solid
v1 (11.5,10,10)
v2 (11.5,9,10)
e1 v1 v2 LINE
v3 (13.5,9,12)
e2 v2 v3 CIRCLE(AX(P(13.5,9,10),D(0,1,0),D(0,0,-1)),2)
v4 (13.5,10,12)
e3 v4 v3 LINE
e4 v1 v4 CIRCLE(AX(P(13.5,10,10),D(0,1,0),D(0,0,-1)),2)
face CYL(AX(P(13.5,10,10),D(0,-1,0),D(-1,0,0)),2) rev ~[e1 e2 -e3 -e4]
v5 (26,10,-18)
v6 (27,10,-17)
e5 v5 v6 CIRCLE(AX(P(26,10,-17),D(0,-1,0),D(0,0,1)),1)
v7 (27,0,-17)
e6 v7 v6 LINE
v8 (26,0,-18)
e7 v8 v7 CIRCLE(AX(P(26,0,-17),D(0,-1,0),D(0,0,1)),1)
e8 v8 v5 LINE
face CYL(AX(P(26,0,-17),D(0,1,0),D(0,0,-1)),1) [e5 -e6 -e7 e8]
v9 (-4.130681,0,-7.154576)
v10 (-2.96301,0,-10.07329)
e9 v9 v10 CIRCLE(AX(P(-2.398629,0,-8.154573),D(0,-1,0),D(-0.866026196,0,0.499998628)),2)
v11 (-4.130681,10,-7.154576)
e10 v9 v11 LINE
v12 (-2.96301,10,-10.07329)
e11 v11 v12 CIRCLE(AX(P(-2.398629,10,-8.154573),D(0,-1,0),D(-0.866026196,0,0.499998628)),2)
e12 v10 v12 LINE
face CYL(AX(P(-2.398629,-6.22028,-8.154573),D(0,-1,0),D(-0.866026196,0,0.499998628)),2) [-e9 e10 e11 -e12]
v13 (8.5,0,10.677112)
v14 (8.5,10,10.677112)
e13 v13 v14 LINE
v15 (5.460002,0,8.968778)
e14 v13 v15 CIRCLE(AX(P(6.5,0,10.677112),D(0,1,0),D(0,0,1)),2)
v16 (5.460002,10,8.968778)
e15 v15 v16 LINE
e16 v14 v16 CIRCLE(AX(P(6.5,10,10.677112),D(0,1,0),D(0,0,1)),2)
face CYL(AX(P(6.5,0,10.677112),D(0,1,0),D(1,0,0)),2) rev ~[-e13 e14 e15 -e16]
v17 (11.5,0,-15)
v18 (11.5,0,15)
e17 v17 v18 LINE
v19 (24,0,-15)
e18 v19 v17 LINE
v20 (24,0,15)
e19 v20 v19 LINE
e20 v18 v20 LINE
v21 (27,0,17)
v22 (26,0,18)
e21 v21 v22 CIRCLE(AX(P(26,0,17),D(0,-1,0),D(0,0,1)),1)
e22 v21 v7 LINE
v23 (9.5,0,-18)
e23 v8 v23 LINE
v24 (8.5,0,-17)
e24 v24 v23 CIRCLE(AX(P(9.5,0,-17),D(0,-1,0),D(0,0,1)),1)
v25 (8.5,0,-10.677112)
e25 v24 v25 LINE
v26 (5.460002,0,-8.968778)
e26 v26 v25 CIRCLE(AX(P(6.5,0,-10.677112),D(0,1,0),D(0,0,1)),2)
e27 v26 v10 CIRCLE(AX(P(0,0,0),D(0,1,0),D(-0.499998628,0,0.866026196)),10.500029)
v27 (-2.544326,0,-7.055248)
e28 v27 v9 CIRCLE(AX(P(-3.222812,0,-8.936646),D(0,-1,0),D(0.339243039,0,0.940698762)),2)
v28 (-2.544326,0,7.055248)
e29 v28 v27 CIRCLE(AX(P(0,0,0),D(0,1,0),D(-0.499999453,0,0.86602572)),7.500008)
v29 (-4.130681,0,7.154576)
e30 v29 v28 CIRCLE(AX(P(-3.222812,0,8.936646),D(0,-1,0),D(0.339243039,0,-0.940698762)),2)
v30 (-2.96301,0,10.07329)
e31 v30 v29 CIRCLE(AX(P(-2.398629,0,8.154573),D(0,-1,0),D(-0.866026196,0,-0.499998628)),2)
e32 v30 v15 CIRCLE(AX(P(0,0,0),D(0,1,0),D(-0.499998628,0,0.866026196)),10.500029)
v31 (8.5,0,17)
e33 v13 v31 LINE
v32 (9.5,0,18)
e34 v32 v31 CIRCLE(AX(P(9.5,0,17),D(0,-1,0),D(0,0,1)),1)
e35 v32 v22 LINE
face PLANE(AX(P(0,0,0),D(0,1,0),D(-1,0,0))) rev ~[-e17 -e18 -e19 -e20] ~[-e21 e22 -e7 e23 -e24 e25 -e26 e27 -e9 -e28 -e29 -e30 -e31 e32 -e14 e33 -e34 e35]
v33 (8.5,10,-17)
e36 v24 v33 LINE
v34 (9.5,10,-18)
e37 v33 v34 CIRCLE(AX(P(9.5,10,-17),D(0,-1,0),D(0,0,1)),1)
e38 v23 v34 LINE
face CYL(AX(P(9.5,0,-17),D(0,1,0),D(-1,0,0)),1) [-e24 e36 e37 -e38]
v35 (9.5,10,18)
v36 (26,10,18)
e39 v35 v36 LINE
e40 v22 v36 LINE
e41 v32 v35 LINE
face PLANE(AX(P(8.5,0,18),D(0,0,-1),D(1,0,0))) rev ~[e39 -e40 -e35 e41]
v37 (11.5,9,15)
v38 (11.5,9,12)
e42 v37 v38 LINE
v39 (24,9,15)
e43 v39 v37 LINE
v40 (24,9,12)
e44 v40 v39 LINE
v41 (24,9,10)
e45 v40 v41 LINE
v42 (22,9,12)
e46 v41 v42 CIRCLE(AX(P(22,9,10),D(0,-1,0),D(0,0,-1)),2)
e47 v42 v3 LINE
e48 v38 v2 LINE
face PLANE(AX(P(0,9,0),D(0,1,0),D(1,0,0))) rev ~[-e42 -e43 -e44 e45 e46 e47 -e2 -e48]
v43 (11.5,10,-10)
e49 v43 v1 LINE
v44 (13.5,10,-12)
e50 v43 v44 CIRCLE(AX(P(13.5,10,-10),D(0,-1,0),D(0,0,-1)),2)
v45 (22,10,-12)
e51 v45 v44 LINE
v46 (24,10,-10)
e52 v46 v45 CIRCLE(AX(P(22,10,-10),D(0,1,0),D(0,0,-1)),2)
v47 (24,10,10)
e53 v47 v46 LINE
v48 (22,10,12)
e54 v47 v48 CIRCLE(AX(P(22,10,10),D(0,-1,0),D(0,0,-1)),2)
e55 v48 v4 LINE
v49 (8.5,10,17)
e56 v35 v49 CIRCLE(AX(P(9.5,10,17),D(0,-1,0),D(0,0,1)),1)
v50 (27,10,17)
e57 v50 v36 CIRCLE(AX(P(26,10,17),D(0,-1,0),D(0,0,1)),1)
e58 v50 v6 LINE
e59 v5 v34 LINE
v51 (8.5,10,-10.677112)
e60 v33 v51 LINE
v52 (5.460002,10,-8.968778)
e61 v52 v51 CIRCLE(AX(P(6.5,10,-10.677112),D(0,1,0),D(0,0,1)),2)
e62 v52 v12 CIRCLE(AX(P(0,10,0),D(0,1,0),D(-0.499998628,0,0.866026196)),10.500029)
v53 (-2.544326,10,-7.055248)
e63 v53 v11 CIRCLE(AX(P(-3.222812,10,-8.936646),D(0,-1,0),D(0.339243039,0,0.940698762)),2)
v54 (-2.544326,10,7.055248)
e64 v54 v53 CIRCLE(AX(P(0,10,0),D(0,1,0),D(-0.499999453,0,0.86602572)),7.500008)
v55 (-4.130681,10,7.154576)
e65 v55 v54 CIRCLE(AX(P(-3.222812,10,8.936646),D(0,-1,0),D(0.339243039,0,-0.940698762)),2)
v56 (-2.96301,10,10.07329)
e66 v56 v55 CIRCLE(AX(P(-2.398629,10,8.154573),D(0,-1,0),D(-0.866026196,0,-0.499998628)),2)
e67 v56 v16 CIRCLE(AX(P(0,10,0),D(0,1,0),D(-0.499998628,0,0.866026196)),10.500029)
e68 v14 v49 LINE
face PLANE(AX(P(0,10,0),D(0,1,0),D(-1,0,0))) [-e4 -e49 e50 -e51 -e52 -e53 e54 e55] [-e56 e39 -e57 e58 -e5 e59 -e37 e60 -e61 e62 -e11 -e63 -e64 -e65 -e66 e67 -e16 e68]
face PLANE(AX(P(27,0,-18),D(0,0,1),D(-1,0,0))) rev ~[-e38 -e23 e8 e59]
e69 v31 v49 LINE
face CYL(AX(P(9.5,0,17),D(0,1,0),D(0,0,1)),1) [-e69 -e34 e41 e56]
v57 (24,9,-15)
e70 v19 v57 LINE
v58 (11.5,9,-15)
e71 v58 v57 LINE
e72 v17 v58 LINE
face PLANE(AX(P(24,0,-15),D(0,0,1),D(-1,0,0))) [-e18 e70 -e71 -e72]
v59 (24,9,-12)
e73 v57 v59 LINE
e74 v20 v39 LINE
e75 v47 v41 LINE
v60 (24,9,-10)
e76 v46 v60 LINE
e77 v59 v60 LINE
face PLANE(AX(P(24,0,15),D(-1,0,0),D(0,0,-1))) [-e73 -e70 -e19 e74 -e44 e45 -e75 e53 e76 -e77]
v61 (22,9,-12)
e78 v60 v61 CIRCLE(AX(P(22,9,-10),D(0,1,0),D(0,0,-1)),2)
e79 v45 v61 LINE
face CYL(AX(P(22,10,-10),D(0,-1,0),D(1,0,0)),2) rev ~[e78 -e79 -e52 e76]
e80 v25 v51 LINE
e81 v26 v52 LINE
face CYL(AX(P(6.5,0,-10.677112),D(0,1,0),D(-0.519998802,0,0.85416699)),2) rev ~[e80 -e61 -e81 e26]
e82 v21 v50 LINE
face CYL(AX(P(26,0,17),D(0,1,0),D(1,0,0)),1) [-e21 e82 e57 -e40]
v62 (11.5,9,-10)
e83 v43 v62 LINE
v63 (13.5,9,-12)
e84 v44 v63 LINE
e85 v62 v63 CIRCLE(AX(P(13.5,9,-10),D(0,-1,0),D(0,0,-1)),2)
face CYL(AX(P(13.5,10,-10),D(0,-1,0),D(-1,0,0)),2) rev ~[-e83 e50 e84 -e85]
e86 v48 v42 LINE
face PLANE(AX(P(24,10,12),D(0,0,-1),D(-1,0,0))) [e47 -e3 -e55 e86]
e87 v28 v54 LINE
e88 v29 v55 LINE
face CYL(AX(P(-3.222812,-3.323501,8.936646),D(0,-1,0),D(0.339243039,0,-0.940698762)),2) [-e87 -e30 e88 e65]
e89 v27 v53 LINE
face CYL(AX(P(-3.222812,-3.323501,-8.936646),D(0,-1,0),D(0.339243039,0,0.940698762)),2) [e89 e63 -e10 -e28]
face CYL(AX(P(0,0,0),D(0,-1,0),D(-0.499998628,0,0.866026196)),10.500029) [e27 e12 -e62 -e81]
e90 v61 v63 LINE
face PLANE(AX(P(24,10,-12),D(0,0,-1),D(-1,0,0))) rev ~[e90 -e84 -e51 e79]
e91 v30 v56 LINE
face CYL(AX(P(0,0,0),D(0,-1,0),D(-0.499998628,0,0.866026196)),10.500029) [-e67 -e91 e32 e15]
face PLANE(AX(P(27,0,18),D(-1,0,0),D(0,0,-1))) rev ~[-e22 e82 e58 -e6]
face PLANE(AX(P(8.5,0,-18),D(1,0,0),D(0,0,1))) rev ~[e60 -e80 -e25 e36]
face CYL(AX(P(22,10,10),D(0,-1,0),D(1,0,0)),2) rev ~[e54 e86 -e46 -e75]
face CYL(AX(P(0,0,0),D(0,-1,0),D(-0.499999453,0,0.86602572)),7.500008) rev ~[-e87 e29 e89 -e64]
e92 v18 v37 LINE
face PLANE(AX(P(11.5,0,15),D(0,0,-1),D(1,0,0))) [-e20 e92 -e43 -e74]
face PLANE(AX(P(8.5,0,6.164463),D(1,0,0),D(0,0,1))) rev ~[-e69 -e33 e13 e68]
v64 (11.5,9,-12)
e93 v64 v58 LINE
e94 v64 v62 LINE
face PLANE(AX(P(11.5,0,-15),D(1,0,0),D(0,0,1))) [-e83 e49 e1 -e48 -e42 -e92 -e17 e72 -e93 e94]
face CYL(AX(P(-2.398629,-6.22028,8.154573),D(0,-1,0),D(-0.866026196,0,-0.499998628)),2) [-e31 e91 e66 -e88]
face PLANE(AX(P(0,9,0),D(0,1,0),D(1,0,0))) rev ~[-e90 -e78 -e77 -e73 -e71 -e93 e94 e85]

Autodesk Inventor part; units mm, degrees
ref_plane "YZ Plane" through (0, 0, 0) normal (1, 0, 0) x (0, 1, 0)
ref_plane "XZ Plane" through (0, 0, 0) normal (0, 1, 0) x (-1, 0, 0)
ref_plane "XY Plane" through (0, 0, 0) normal (0, 0, 1) x (1, 0, 0)
sketch "Sketch1" plane through (0, 0, 0) normal (0, 1, 0) x (-1, 0, 0)
  arc A0 (3.75, 6.4952) -> (3.75, -6.4952) centre (0, 0) ccw
  arc A1 (5.25, 9.0933) -> (5.25, -9.0933) centre (0, 0) ccw
  line L0 (-11.5, 15) -> (-24, 15)
  line L1 (-24, 15) -> (-24, -15)
  line L2 (-24, -15) -> (-11.5, -15)
  line L3 (-11.5, -15) -> (-11.5, 15)
  line L4 (-8.5, 18) -> (-27, 18)
  line L5 (-27, 18) -> (-27, -18)
  line L6 (-27, -18) -> (-8.5, -18)
  line L7 (-8.5, -18) -> (-8.5, 18)
  line L8 (0, 0) -> (5.25, 9.0933)
  line L9 (0, 0) -> (10.5, 0) construction
  line L10 (5.25, 9.0933) -> (0, 0)
  line L11 (0, 0) -> (5.25, -9.0933)
  line L12 (0, 0) -> (10.5, 0) construction
  dimension "d0" = 15
  dimension "d1" = 3
  dimension "d2" = 12.5
  dimension "d3" = 30
  dimension "d4" = 3
  dimension "d5" = 3
  dimension "d6" = 3
  dimension "d7" = 3
  dimension "d8" = 15
  dimension "d9" = 11.5
  dimension "d10" = 60
  dimension "d11" = 60
extrude "Extrusion1" add sketch "Sketch1" along normal blind 10 contours A0 L11 A1 L7 L8 | L7 A1 | A1 L7 L6 L5 L4
fillet "Fillet1" radius 2 4 edges at (-5.25, 5, 9.0933) (-3.75, 5, 6.4952) (-5.25, 5, -9.0933) (-3.75, 5, -6.4952)
fillet "Fillet2" radius 2 2 edges at (8.5, 5, 6.1644) (8.5, 5, -6.1644)
fillet "Fillet3" radius 1 4 edges at (8.5, 5, 18) (27, 5, 18) (8.5, 5, -18) (27, 5, -18)
sketch "Sketch2" plane through (0, 10, 0) normal (0, 1, 0) x (1, 0, 0)
  line L0 (11.5, -15) -> (11.5, 15) projected
  line L1 (11.5, 15) -> (24, 15) projected
  line L2 (24, 15) -> (24, -15) projected
  line L3 (24, -15) -> (11.5, -15) projected
  arc A0 (27, 17) -> (26, 18) centre (26, 17) ccw projected
  line L4 (26, 18) -> (9.5, 18) projected
  arc A1 (9.5, 18) -> (8.5, 17) centre (9.5, 17) ccw projected
  line L5 (8.5, 17) -> (8.5, 10.6771) projected
  arc A2 (5.46, 8.9687) -> (8.5, 10.6771) centre (6.5, 10.6771) ccw projected
  arc A3 (5.46, 8.9687) -> (-2.963, 10.0733) centre (0, 0) ccw projected
  arc A4 (-2.963, 10.0733) -> (-4.1307, 7.1545) centre (-2.3986, 8.1545) ccw projected
  arc A5 (-4.1307, 7.1545) -> (-2.5443, 7.0552) centre (-3.2228, 8.9366) ccw projected
  arc A6 (-2.5443, -7.0552) -> (-2.5443, 7.0552) centre (0, 0) ccw projected
  arc A7 (-2.5443, -7.0552) -> (-4.1307, -7.1545) centre (-3.2228, -8.9366) ccw projected
  arc A8 (-4.1307, -7.1545) -> (-2.963, -10.0733) centre (-2.3986, -8.1545) ccw projected
  arc A9 (-2.963, -10.0733) -> (5.46, -8.9687) centre (0, 0) ccw projected
  arc A10 (8.5, -10.6771) -> (5.46, -8.9687) centre (6.5, -10.6771) ccw projected
  line L6 (8.5, -10.6771) -> (8.5, -17) projected
  arc A11 (8.5, -17) -> (9.5, -18) centre (9.5, -17) ccw projected
  line L7 (9.5, -18) -> (26, -18) projected
  arc A12 (26, -18) -> (27, -17) centre (26, -17) ccw projected
  line L8 (27, -17) -> (27, 17) projected
  line L9 (11.5, 15) -> (24, 15)
  line L10 (24, 15) -> (24, 12)
  line L11 (24, 12) -> (11.5, 12)
  line L12 (11.5, 12) -> (11.5, 15)
  line L13 (11.5, -15) -> (24, -15)
  line L14 (24, -15) -> (24, -12)
  line L15 (24, -12) -> (11.5, -12)
  line L16 (11.5, -12) -> (11.5, -15)
  dimension "d17" = 3
  dimension "d18" = 3
extrude "Extrusion2" add sketch "Sketch2" against normal blind 1 contours L0 L15 L2 L3 | L0 L1 L2 L11
fillet "Fillet4" radius 2 4 edges at (11.5, 9.5, -12) (24, 9.5, -12) (11.5, 9.5, 12) (24, 9.5, 12)
equation "\"d5\" = d4"
equation "\"d6\" = d4"
equation "\"d7\" = d4"
equation "\"d8\" = 0.5 * d3"
properties part number "clip"
